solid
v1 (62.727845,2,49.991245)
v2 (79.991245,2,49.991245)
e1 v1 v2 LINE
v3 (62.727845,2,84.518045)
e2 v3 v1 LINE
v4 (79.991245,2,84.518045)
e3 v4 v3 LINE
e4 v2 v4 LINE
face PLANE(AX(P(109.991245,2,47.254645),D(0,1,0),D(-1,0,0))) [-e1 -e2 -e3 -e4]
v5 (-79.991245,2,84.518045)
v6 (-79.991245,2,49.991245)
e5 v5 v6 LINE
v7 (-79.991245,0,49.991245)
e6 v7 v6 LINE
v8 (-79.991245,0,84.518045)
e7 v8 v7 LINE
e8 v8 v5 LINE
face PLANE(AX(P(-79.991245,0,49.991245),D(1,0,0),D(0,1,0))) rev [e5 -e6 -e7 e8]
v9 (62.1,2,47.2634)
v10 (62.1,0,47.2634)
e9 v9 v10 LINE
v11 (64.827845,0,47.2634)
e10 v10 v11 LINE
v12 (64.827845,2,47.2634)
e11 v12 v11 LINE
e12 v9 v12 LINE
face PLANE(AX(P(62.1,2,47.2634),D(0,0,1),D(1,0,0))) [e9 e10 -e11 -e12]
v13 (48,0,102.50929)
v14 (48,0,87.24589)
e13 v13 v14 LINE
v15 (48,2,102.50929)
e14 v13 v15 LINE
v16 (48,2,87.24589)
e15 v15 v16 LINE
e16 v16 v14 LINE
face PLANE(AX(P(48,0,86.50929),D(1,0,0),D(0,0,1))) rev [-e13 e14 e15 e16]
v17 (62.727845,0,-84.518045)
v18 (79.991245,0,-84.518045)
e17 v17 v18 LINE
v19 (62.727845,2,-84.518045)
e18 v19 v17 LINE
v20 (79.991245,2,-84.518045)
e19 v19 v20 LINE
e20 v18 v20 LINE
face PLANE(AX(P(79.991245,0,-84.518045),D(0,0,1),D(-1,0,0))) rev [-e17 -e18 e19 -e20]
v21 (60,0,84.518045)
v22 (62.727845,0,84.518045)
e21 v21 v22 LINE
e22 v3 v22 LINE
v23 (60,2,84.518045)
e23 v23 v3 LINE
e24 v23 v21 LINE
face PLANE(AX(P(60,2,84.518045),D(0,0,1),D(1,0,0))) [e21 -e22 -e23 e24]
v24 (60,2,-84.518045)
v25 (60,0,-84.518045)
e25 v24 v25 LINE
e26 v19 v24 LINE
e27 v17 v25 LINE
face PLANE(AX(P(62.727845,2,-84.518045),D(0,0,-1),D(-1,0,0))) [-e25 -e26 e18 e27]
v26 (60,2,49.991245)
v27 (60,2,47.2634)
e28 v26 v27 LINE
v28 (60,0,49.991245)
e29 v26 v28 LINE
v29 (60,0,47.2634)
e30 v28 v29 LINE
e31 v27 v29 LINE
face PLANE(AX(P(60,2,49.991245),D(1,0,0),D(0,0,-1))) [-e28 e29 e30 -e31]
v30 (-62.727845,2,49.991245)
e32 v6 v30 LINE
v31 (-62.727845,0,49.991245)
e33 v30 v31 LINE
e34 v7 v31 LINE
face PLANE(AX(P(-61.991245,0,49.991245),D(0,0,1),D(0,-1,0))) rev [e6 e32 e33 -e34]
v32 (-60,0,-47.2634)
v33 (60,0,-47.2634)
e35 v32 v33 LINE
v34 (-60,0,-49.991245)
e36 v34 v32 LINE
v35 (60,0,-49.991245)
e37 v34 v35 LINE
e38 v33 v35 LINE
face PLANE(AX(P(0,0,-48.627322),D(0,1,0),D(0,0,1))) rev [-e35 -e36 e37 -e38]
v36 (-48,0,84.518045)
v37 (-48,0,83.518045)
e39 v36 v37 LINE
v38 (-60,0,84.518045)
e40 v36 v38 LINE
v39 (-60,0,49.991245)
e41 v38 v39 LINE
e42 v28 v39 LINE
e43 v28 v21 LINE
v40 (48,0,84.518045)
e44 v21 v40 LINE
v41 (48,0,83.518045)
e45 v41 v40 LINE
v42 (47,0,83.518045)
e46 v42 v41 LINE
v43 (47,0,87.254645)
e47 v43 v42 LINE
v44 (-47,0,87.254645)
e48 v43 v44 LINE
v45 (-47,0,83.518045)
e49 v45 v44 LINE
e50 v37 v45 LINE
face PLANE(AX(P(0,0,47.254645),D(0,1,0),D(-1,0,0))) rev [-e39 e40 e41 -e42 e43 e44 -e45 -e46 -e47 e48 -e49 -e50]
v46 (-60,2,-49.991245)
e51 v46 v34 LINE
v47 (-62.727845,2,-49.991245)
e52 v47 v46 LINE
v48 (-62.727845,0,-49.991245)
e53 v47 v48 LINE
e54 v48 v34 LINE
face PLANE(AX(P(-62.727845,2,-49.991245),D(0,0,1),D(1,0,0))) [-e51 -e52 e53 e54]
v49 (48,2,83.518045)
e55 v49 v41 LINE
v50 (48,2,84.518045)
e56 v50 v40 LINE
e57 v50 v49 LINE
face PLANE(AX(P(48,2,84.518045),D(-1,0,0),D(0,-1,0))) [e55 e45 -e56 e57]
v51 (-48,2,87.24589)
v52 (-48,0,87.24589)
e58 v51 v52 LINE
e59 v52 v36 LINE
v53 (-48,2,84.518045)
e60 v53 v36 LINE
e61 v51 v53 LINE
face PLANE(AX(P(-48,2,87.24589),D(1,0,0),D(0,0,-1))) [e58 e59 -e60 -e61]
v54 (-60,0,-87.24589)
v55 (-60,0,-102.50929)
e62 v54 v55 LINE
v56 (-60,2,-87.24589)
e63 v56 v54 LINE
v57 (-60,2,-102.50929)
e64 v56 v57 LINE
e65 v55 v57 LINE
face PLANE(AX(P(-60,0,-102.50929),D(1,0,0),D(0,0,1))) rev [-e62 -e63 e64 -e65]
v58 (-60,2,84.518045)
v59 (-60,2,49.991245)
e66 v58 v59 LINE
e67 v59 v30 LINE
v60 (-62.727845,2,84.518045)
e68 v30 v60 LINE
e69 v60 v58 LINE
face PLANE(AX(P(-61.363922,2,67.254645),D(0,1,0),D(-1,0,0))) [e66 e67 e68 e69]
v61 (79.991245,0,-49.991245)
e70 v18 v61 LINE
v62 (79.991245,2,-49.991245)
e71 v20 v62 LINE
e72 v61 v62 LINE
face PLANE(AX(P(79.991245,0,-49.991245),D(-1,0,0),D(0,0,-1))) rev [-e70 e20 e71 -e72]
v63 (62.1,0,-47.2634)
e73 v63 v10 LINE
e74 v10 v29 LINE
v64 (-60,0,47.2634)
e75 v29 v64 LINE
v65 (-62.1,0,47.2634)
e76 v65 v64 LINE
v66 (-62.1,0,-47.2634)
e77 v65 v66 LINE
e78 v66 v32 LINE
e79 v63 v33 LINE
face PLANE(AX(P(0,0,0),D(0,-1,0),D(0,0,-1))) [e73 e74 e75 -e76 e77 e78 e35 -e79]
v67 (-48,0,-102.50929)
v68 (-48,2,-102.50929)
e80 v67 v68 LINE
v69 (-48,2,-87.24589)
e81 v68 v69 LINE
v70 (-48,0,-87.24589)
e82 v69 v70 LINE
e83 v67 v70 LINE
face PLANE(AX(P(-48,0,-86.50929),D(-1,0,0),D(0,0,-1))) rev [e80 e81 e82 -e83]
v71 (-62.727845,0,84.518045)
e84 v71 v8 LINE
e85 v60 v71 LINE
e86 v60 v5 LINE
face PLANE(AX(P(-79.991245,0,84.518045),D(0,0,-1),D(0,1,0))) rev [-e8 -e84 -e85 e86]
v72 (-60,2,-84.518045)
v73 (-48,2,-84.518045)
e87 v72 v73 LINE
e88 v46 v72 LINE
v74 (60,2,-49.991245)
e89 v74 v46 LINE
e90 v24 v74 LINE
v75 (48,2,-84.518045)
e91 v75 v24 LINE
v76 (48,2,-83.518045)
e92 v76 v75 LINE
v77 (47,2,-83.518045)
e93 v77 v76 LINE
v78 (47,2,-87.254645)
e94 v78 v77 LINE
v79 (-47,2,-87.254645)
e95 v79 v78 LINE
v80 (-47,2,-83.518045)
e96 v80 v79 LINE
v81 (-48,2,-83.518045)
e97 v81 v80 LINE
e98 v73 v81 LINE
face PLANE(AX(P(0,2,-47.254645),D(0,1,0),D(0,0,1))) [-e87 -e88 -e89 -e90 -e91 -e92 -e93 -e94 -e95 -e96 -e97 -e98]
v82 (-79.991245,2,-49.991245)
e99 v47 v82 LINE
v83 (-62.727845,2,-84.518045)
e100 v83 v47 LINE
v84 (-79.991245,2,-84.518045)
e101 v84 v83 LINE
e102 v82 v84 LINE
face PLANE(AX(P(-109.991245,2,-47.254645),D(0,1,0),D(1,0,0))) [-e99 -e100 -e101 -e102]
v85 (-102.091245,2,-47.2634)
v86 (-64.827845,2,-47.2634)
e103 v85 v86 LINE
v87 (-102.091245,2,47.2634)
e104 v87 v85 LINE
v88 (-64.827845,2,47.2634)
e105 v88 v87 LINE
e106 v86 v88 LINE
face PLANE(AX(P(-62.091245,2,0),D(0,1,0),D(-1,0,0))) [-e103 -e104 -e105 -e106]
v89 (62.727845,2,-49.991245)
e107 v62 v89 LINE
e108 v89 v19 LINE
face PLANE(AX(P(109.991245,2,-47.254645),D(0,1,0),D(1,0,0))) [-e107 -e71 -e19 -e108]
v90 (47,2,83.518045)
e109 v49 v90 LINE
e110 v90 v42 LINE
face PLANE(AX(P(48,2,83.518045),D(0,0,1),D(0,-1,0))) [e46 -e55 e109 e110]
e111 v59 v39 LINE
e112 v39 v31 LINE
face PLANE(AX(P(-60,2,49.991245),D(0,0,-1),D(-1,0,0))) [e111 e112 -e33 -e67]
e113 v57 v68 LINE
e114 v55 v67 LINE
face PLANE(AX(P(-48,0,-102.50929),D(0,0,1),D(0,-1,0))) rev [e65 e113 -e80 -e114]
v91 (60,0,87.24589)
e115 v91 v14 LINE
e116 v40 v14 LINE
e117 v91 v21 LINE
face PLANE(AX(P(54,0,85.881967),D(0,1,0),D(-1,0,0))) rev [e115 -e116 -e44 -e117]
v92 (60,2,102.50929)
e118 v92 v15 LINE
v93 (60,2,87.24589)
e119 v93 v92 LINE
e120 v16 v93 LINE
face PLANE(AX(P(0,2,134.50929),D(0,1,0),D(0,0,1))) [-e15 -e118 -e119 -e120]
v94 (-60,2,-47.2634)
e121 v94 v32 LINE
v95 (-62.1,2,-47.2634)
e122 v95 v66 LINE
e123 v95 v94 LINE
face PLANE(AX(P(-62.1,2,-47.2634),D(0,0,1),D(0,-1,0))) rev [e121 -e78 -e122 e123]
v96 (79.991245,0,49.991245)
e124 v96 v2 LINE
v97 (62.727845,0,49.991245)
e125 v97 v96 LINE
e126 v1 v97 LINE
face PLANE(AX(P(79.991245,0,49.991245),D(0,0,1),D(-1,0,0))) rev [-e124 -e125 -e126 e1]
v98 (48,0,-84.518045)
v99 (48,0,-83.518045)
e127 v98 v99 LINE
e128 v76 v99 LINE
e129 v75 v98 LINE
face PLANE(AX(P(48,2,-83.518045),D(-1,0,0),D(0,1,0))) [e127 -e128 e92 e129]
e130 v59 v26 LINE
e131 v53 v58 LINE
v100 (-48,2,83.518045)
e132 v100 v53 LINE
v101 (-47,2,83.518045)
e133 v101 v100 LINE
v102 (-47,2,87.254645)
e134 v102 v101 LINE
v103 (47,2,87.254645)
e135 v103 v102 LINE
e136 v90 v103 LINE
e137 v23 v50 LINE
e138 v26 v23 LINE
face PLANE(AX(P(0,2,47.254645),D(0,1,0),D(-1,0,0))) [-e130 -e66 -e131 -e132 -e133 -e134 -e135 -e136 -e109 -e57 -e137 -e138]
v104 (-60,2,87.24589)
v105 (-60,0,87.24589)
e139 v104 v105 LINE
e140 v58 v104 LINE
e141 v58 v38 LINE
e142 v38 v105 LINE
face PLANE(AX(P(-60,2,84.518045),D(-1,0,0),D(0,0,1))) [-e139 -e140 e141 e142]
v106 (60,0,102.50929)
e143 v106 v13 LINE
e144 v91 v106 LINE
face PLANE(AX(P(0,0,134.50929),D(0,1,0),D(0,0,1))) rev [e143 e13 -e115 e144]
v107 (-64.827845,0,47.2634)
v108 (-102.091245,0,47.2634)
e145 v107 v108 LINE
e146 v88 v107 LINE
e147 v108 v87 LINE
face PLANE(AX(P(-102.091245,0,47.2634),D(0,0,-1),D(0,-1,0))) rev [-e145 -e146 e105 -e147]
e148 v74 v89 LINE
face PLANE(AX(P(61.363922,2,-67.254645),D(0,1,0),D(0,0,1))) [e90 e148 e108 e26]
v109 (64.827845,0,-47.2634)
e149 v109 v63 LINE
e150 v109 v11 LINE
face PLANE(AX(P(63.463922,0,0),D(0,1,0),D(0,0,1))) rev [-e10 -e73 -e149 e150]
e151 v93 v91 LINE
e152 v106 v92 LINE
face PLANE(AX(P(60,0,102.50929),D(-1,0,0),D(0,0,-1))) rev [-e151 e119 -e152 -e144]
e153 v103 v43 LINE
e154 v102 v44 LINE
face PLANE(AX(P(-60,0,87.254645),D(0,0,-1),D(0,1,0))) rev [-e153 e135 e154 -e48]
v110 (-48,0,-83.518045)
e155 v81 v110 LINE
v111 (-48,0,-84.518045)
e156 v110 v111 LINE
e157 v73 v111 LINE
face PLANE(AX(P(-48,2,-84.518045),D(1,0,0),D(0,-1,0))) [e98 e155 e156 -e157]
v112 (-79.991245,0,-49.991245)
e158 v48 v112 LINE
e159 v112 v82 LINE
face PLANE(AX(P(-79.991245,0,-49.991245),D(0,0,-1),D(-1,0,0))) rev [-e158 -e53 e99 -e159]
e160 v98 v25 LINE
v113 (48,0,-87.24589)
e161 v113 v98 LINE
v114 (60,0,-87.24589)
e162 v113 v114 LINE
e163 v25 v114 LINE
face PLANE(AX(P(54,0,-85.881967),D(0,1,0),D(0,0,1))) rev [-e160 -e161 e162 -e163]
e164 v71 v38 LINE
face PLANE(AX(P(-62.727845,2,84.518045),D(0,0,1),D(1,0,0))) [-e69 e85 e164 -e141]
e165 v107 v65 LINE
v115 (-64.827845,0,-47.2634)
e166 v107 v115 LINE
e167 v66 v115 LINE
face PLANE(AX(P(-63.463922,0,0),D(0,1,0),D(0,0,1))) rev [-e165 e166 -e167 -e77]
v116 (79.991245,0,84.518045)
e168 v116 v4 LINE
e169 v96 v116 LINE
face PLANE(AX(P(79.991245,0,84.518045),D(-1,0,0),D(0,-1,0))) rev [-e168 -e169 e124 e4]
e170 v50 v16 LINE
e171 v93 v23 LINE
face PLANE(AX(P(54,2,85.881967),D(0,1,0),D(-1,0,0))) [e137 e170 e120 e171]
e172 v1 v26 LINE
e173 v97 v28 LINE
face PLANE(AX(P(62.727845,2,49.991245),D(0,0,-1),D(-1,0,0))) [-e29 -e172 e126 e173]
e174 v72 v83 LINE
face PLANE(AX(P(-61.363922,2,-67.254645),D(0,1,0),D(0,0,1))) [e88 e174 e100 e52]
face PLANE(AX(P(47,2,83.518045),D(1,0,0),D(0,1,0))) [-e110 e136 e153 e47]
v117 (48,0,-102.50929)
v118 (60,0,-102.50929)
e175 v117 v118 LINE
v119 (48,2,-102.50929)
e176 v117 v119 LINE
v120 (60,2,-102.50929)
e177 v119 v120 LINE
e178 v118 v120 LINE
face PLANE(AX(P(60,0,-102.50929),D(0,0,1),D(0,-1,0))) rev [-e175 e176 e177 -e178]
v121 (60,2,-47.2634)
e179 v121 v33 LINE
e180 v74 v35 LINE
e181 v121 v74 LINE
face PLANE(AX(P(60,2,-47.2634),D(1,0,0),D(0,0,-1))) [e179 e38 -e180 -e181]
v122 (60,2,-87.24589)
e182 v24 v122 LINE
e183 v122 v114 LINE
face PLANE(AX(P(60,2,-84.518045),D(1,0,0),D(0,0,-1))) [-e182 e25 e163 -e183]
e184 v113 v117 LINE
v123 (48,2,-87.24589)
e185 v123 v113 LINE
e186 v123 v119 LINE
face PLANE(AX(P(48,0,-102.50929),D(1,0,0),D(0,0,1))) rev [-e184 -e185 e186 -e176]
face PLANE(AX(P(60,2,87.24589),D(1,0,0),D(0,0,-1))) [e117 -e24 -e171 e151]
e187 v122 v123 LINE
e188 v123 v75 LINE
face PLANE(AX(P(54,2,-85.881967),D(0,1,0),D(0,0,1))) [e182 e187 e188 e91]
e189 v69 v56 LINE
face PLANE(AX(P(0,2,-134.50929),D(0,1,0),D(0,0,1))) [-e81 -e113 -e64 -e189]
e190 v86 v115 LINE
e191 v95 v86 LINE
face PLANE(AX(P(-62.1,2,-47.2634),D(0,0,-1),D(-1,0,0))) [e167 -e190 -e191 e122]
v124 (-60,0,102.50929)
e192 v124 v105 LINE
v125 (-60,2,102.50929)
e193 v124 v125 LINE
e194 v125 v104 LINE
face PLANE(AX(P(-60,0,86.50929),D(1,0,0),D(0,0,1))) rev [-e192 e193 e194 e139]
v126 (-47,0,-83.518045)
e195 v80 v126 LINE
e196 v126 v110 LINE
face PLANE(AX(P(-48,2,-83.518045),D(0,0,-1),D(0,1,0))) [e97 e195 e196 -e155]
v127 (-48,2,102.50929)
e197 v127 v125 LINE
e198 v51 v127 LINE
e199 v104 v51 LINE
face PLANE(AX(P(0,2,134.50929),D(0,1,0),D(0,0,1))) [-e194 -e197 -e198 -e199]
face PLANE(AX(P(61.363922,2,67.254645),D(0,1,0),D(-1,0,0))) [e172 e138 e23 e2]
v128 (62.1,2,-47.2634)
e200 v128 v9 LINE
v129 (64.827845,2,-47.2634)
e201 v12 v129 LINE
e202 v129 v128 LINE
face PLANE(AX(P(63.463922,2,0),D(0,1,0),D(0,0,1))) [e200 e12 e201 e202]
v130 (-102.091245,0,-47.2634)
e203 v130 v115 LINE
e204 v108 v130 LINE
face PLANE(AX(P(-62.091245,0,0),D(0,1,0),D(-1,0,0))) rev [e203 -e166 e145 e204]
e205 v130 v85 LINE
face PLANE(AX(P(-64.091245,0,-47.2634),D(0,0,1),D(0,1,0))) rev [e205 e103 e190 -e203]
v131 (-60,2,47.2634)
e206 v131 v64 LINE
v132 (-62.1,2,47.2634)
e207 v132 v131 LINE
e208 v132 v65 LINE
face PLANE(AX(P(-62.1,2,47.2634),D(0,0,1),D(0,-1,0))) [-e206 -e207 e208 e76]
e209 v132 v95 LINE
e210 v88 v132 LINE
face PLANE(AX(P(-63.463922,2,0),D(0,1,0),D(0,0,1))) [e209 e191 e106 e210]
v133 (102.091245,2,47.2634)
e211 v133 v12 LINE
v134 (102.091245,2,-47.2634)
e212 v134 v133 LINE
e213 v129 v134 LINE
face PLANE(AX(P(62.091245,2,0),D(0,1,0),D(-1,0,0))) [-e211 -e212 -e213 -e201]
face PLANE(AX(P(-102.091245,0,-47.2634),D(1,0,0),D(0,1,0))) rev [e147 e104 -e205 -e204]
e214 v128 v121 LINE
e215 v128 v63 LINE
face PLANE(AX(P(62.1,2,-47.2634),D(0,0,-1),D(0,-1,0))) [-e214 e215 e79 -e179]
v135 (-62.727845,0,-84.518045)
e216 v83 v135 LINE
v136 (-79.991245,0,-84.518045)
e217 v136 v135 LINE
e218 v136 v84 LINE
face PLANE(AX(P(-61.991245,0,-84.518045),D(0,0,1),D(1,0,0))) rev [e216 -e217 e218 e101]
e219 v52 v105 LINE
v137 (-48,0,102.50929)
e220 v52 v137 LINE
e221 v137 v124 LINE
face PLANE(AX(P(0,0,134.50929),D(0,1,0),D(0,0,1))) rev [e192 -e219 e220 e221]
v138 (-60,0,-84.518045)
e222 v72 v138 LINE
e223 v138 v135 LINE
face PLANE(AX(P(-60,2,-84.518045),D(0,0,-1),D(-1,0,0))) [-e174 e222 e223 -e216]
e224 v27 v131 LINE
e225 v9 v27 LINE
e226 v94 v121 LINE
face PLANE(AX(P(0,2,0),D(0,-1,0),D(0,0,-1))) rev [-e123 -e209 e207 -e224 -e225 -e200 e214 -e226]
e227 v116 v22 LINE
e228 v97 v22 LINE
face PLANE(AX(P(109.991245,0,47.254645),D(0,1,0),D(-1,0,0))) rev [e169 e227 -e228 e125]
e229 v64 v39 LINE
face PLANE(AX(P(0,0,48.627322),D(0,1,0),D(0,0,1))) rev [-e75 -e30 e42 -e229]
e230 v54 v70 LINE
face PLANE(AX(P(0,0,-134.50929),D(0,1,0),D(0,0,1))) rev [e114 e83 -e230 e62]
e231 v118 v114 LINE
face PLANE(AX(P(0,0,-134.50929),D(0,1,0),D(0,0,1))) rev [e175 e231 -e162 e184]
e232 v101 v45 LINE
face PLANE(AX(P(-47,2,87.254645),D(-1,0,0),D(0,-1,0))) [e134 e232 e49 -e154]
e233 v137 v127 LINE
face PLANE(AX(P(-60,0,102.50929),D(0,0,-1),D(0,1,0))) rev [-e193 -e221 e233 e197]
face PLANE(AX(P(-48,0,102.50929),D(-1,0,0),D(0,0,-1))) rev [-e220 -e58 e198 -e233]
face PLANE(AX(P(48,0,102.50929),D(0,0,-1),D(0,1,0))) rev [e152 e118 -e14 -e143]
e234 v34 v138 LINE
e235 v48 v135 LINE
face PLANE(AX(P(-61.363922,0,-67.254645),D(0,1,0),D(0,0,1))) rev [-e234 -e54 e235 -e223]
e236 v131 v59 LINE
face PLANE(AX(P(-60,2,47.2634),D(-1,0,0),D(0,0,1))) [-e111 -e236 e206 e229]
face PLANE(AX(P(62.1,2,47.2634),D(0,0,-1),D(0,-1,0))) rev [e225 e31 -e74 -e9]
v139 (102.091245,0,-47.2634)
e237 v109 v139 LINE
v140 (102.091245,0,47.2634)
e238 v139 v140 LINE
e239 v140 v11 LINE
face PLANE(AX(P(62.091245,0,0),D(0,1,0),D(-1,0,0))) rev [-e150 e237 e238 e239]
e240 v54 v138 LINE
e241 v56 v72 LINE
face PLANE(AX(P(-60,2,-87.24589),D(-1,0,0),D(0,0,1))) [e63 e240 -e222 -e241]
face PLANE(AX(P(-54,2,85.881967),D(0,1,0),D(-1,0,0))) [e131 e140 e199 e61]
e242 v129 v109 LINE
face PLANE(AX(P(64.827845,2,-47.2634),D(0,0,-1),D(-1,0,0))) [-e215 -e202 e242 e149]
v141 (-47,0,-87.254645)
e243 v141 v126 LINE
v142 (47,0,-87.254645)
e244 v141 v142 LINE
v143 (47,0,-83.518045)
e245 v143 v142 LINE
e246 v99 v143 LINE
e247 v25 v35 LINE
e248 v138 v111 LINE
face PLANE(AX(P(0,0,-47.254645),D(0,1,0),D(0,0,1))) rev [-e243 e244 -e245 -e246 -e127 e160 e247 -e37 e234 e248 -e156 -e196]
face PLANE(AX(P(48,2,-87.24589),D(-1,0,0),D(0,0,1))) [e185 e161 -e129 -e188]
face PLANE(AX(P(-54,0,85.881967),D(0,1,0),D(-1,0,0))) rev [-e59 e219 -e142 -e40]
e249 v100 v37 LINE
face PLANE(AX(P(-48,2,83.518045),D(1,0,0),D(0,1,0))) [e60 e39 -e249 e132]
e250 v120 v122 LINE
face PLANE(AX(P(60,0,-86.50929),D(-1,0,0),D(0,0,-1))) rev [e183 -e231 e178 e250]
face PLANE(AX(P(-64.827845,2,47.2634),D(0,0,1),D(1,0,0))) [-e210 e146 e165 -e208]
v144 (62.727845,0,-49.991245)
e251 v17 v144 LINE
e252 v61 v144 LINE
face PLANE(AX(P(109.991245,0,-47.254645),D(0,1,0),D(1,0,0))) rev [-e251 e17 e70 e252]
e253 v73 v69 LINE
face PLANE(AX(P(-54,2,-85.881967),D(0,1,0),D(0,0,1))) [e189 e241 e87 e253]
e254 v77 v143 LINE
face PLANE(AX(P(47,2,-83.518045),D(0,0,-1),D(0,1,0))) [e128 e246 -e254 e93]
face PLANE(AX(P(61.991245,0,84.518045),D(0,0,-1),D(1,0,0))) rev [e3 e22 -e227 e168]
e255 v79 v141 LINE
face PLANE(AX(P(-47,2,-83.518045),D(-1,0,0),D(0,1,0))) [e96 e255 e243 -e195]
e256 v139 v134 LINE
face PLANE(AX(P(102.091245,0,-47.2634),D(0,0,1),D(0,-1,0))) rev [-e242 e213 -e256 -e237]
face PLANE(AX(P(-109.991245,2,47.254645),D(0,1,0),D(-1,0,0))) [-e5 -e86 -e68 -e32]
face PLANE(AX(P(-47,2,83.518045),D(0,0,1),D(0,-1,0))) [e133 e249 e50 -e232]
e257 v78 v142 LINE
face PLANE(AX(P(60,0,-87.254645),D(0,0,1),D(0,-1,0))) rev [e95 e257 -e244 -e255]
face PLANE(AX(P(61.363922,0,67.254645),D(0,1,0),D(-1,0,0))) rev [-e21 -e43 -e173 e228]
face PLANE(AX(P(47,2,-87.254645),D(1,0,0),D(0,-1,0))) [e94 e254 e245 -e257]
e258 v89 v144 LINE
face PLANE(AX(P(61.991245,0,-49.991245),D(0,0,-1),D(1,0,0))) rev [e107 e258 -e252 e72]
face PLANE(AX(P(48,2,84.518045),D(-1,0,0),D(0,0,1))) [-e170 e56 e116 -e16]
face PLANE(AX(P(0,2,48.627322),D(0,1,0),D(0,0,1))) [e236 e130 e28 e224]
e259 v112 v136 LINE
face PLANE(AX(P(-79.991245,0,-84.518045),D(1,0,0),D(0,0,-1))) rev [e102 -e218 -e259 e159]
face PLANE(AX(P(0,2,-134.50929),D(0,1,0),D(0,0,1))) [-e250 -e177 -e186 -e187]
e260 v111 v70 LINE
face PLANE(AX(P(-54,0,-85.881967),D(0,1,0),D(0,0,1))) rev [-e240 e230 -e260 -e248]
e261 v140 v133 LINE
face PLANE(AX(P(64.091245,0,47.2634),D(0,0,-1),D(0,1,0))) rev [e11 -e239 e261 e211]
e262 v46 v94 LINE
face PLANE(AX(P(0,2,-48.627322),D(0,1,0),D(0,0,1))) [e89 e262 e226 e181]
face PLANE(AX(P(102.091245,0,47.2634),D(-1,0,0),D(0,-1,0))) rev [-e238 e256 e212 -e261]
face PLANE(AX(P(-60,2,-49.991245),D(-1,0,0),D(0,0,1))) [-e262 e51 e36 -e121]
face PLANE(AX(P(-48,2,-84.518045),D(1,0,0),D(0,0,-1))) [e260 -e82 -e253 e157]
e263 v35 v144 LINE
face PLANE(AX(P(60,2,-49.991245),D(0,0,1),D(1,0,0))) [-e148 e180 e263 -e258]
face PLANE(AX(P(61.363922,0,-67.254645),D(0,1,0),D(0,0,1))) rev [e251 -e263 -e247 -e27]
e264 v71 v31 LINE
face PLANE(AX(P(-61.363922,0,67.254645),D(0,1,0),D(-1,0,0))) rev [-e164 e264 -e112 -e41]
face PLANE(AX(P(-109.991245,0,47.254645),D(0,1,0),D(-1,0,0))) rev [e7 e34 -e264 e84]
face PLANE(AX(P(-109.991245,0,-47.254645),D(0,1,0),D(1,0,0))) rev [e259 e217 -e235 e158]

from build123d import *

# Parameters (mm, degrees)
SKETCH1_W                      = 120
SKETCH1_H                      = 100
BASE_FLANGE1_DEPTH             = 2
EDGE_FLANGE1_STRIP_W           = 9.4732
EDGE_FLANGE1_STRIP_H           = 2
EDGE_FLANGE1_STRIP_CUT_DEPTH   = 120
EDGE_FLANGE1_STRIP_2_W         = 9.4732
EDGE_FLANGE1_STRIP_2_H         = 2
EDGE_FLANGE1_STRIP_CUT_2_DEPTH = 120
EDGE_FLANGE1_DEPTH             = 120
EDGE_FLANGE1_BEND_DEPTH        = 120
EDGE_FLANGE2_DEPTH             = 94.5268
EDGE_FLANGE2_BEND_DEPTH        = 94.5268
EDGE_FLANGE5_STRIP_W           = 9.4732
EDGE_FLANGE5_STRIP_H           = 2
EDGE_FLANGE5_STRIP_CUT_DEPTH   = 12
EDGE_FLANGE5_RELIEF_W          = 10.4732
EDGE_FLANGE5_RELIEF_H          = 1
EDGE_FLANGE5_RELIEF_CUT_DEPTH  = 2
EDGE_FLANGE5_DEPTH             = 12
EDGE_FLANGE6_STRIP_W           = 9.4732
EDGE_FLANGE6_STRIP_H           = 2
EDGE_FLANGE6_STRIP_CUT_DEPTH   = 12
EDGE_FLANGE6_RELIEF_W          = 10.4732
EDGE_FLANGE6_RELIEF_H          = 1
EDGE_FLANGE6_RELIEF_CUT_DEPTH  = 2
EDGE_FLANGE6_DEPTH             = 12
EDGE_FLANGE7_STRIP_W           = 9.4732
EDGE_FLANGE7_STRIP_H           = 2
EDGE_FLANGE7_STRIP_CUT_DEPTH   = 12
EDGE_FLANGE7_RELIEF_W          = 10.4732
EDGE_FLANGE7_RELIEF_H          = 1
EDGE_FLANGE7_RELIEF_CUT_DEPTH  = 2
EDGE_FLANGE7_DEPTH             = 12
EDGE_FLANGE8_STRIP_W           = 9.4732
EDGE_FLANGE8_STRIP_H           = 2
EDGE_FLANGE8_STRIP_CUT_DEPTH   = 12
EDGE_FLANGE8_RELIEF_W          = 10.4732
EDGE_FLANGE8_RELIEF_H          = 1
EDGE_FLANGE8_RELIEF_CUT_DEPTH  = 2
EDGE_FLANGE8_DEPTH             = 12
EDGE_FLANGE9_DEPTH             = 34.5268
EDGE_FLANGE9_BEND_DEPTH        = 34.5268
EDGE_FLANGE9_BEND_2_DEPTH      = 34.5268
EDGE_FLANGE9_BEND_3_DEPTH      = 34.5268
UNFOLD1_START                  = 2
UNFOLD1_DEPTH                  = 38
UNFOLD1_2_DEPTH                = 2


# Read off the part's stored shape, not the designer's step: Unfold1
# Sheet-metal steps are written as plain solids
with BuildPart() as part:
    # Sketch1 → Base-Flange1 (new body)
    with BuildSketch(Plane(origin=(0, 0, 0), x_dir=(1, 0, 0), z_dir=(0, 1, 0))):
        Rectangle(SKETCH1_W, SKETCH1_H)
    extrude(amount=BASE_FLANGE1_DEPTH)

    # Edge-Flange1 strip (across the edge) → Edge-Flange1 strip cut (cut)
    with BuildSketch(Plane(origin=(60, 2, -50), x_dir=(0, 0, 1), z_dir=(-1, 0, 0))):
        with Locations((-2, -1)):
            Rectangle(EDGE_FLANGE1_STRIP_W, EDGE_FLANGE1_STRIP_H)
    extrude(amount=EDGE_FLANGE1_STRIP_CUT_DEPTH, mode=Mode.SUBTRACT)

    # Edge-Flange1 strip 2 (across the edge) → Edge-Flange1 strip cut 2 (cut)
    with BuildSketch(Plane(origin=(-60, 2, 50), x_dir=(0, 0, -1), z_dir=(1, 0, 0))):
        with Locations((-2, -1)):
            Rectangle(EDGE_FLANGE1_STRIP_2_W, EDGE_FLANGE1_STRIP_2_H)
    extrude(amount=EDGE_FLANGE1_STRIP_CUT_2_DEPTH, mode=Mode.SUBTRACT)

    # Edge-Flange1 section (across the edge) → Edge-Flange1 (add)
    with BuildSketch(Plane(origin=(60, 2, -50), x_dir=(0, 0, 1), z_dir=(-1, 0, 0))):
        with BuildLine():
            Line((0, 0.7366), (0, 38))
            Line((0, 38), (2, 38))
            Line((2, 38), (2, 0.7366))
            ThreePointArc((2, 0.7366), (2.215745145, 0.215745145), (2.7366, 0))
            Line((2.7366, 0), (2.7366, -2))
            ThreePointArc((2.7366, -2), (0.801531583, -1.198468417), (0, 0.7366))
        make_face()
    extrude(amount=EDGE_FLANGE1_DEPTH)

    # Edge-Flange1 section 2 (across the edge) → Edge-Flange1 bend (add)
    with BuildSketch(Plane(origin=(-60, 2, 50), x_dir=(0, 0, -1), z_dir=(1, 0, 0))):
        with BuildLine():
            Line((0, 0.7366), (0, 38))
            Line((0, 38), (2, 38))
            Line((2, 38), (2, 0.7366))
            ThreePointArc((2, 0.7366), (2.215745145, 0.215745145), (2.7366, 0))
            Line((2.7366, 0), (2.7366, -2))
            ThreePointArc((2.7366, -2), (0.801531583, -1.198468417), (0, 0.7366))
        make_face()
    extrude(amount=EDGE_FLANGE1_BEND_DEPTH)

    # Edge-Flange2 section (across the edge) → Edge-Flange2 (add)
    with BuildSketch(Plane(origin=(-62.8366, 2, -47.2634), x_dir=(1, 0, 0), z_dir=(0, 0, 1))):
        with BuildLine():
            Line((-2, 0.7366), (-2, 38))
            Line((-2, 38), (0, 38))
            Line((0, 38), (0, 0.7366))
            ThreePointArc((0, 0.7366), (0.215745145, 0.215745145), (0.7366, 0))
            Line((0.7366, 0), (2.8366, 0))
            Line((2.8366, 0), (2.8366, -2))
            Line((2.8366, -2), (0.7366, -2))
            ThreePointArc((0.7366, -2), (-1.198468417, -1.198468417), (-2, 0.7366))
        make_face()
    extrude(amount=EDGE_FLANGE2_DEPTH)

    # Edge-Flange2 section 2 (across the edge) → Edge-Flange2 bend (add)
    with BuildSketch(Plane(origin=(62.8366, 2, 47.2634), x_dir=(-1, 0, 0), z_dir=(0, 0, -1))):
        with BuildLine():
            Line((-2, 0.7366), (-2, 38))
            Line((-2, 38), (0, 38))
            Line((0, 38), (0, 0.7366))
            ThreePointArc((0, 0.7366), (0.215745145, 0.215745145), (0.7366, 0))
            Line((0.7366, 0), (2.8366, 0))
            Line((2.8366, 0), (2.8366, -2))
            Line((2.8366, -2), (0.7366, -2))
            ThreePointArc((0.7366, -2), (-1.198468417, -1.198468417), (-2, 0.7366))
        make_face()
    extrude(amount=EDGE_FLANGE2_BEND_DEPTH)

    # Edge-Flange5 strip (across the edge) → Edge-Flange5 strip cut (cut)
    with BuildSketch(Plane(origin=(48, 40, 48), x_dir=(0, -1, 0), z_dir=(1, 0, 0))):
        with Locations((-2, -1)):
            Rectangle(EDGE_FLANGE5_STRIP_W, EDGE_FLANGE5_STRIP_H)
    extrude(amount=EDGE_FLANGE5_STRIP_CUT_DEPTH, mode=Mode.SUBTRACT)

    # Edge-Flange5 relief (on the sheet) → Edge-Flange5 relief cut (cut)
    with BuildSketch(Plane(origin=(48, 37.2634, 48), x_dir=(0, -1, 0), z_dir=(0, 0, -1))):
        with Locations((-4.2366, 0.5)):
            Rectangle(EDGE_FLANGE5_RELIEF_W, EDGE_FLANGE5_RELIEF_H)
    extrude(amount=-EDGE_FLANGE5_RELIEF_CUT_DEPTH, mode=Mode.SUBTRACT)

    # Edge-Flange5 section (across the edge) → Edge-Flange5 (add)
    with BuildSketch(Plane(origin=(48, 40, 48), x_dir=(0, -1, 0), z_dir=(1, 0, 0))):
        with BuildLine():
            Line((0, 0.7366), (0, 16))
            Line((0, 16), (2, 16))
            Line((2, 16), (2, 0.7366))
            ThreePointArc((2, 0.7366), (2.215745145, 0.215745145), (2.7366, 0))
            Line((2.7366, 0), (2.7366, -2))
            ThreePointArc((2.7366, -2), (0.801531583, -1.198468417), (0, 0.7366))
        make_face()
    extrude(amount=EDGE_FLANGE5_DEPTH)

    # Edge-Flange6 strip (across the edge) → Edge-Flange6 strip cut (cut)
    with BuildSketch(Plane(origin=(-60, 40, 48), x_dir=(0, -1, 0), z_dir=(1, 0, 0))):
        with Locations((-2, -1)):
            Rectangle(EDGE_FLANGE6_STRIP_W, EDGE_FLANGE6_STRIP_H)
    extrude(amount=EDGE_FLANGE6_STRIP_CUT_DEPTH, mode=Mode.SUBTRACT)

    # Edge-Flange6 relief (on the sheet) → Edge-Flange6 relief cut (cut)
    with BuildSketch(Plane(origin=(-60, 37.2634, 48), x_dir=(0, -1, 0), z_dir=(0, 0, -1))):
        with Locations((-4.2366, -12.5)):
            Rectangle(EDGE_FLANGE6_RELIEF_W, EDGE_FLANGE6_RELIEF_H)
    extrude(amount=-EDGE_FLANGE6_RELIEF_CUT_DEPTH, mode=Mode.SUBTRACT)

    # Edge-Flange6 section (across the edge) → Edge-Flange6 (add)
    with BuildSketch(Plane(origin=(-60, 40, 48), x_dir=(0, -1, 0), z_dir=(1, 0, 0))):
        with BuildLine():
            Line((0, 0.7366), (0, 16))
            Line((0, 16), (2, 16))
            Line((2, 16), (2, 0.7366))
            ThreePointArc((2, 0.7366), (2.215745145, 0.215745145), (2.7366, 0))
            Line((2.7366, 0), (2.7366, -2))
            ThreePointArc((2.7366, -2), (0.801531583, -1.198468417), (0, 0.7366))
        make_face()
    extrude(amount=EDGE_FLANGE6_DEPTH)

    # Edge-Flange7 strip (across the edge) → Edge-Flange7 strip cut (cut)
    with BuildSketch(Plane(origin=(-48, 40, -48), x_dir=(0, -1, 0), z_dir=(-1, 0, 0))):
        with Locations((-2, -1)):
            Rectangle(EDGE_FLANGE7_STRIP_W, EDGE_FLANGE7_STRIP_H)
    extrude(amount=EDGE_FLANGE7_STRIP_CUT_DEPTH, mode=Mode.SUBTRACT)

    # Edge-Flange7 relief (on the sheet) → Edge-Flange7 relief cut (cut)
    with BuildSketch(Plane(origin=(-48, 37.2634, -48), x_dir=(0, -1, 0), z_dir=(0, 0, 1))):
        with Locations((-4.2366, 0.5)):
            Rectangle(EDGE_FLANGE7_RELIEF_W, EDGE_FLANGE7_RELIEF_H)
    extrude(amount=-EDGE_FLANGE7_RELIEF_CUT_DEPTH, mode=Mode.SUBTRACT)

    # Edge-Flange7 section (across the edge) → Edge-Flange7 (add)
    with BuildSketch(Plane(origin=(-48, 40, -48), x_dir=(0, -1, 0), z_dir=(-1, 0, 0))):
        with BuildLine():
            Line((0, 0.7366), (0, 16))
            Line((0, 16), (2, 16))
            Line((2, 16), (2, 0.7366))
            ThreePointArc((2, 0.7366), (2.215745145, 0.215745145), (2.7366, 0))
            Line((2.7366, 0), (2.7366, -2))
            ThreePointArc((2.7366, -2), (0.801531583, -1.198468417), (0, 0.7366))
        make_face()
    extrude(amount=EDGE_FLANGE7_DEPTH)

    # Edge-Flange8 strip (across the edge) → Edge-Flange8 strip cut (cut)
    with BuildSketch(Plane(origin=(60, 40, -48), x_dir=(0, -1, 0), z_dir=(-1, 0, 0))):
        with Locations((-2, -1)):
            Rectangle(EDGE_FLANGE8_STRIP_W, EDGE_FLANGE8_STRIP_H)
    extrude(amount=EDGE_FLANGE8_STRIP_CUT_DEPTH, mode=Mode.SUBTRACT)

    # Edge-Flange8 relief (on the sheet) → Edge-Flange8 relief cut (cut)
    with BuildSketch(Plane(origin=(60, 37.2634, -48), x_dir=(0, -1, 0), z_dir=(0, 0, 1))):
        with Locations((-4.2366, -12.5)):
            Rectangle(EDGE_FLANGE8_RELIEF_W, EDGE_FLANGE8_RELIEF_H)
    extrude(amount=-EDGE_FLANGE8_RELIEF_CUT_DEPTH, mode=Mode.SUBTRACT)

    # Edge-Flange8 section (across the edge) → Edge-Flange8 (add)
    with BuildSketch(Plane(origin=(60, 40, -48), x_dir=(0, -1, 0), z_dir=(-1, 0, 0))):
        with BuildLine():
            Line((0, 0.7366), (0, 16))
            Line((0, 16), (2, 16))
            Line((2, 16), (2, 0.7366))
            ThreePointArc((2, 0.7366), (2.215745145, 0.215745145), (2.7366, 0))
            Line((2.7366, 0), (2.7366, -2))
            ThreePointArc((2.7366, -2), (0.801531583, -1.198468417), (0, 0.7366))
        make_face()
    extrude(amount=EDGE_FLANGE8_DEPTH)

    # Edge-Flange9 section (across the edge) → Edge-Flange9 (add)
    with BuildSketch(Plane(origin=(60.7366, 37.2634, 48), x_dir=(-1, 0, 0), z_dir=(0, -1, 0))):
        with BuildLine():
            Line((-2, 0.7366), (-2, 18))
            Line((-2, 18), (0, 18))
            Line((0, 18), (0, 0.7366))
            ThreePointArc((0, 0.7366), (0.215745145, 0.215745145), (0.7366, 0))
            Line((0.7366, 0), (0.7366, -2))
            ThreePointArc((0.7366, -2), (-1.198468417, -1.198468417), (-2, 0.7366))
        make_face()
    extrude(amount=EDGE_FLANGE9_DEPTH)

    # Edge-Flange9 section 2 (across the edge) → Edge-Flange9 bend (add)
    with BuildSketch(Plane(origin=(60.7366, 2.7366, -48), x_dir=(-1, 0, 0), z_dir=(0, 1, 0))):
        with BuildLine():
            Line((-2, 0.7366), (-2, 18))
            Line((-2, 18), (0, 18))
            Line((0, 18), (0, 0.7366))
            ThreePointArc((0, 0.7366), (0.215745145, 0.215745145), (0.7366, 0))
            Line((0.7366, 0), (0.7366, -2))
            ThreePointArc((0.7366, -2), (-1.198468417, -1.198468417), (-2, 0.7366))
        make_face()
    extrude(amount=EDGE_FLANGE9_BEND_DEPTH)

    # Edge-Flange9 section 3 (across the edge) → Edge-Flange9 bend 2 (add)
    with BuildSketch(Plane(origin=(-60.7366, 37.2634, -48), x_dir=(1, 0, 0), z_dir=(0, -1, 0))):
        with BuildLine():
            Line((-2, 0.7366), (-2, 18))
            Line((-2, 18), (0, 18))
            Line((0, 18), (0, 0.7366))
            ThreePointArc((0, 0.7366), (0.215745145, 0.215745145), (0.7366, 0))
            Line((0.7366, 0), (0.7366, -2))
            ThreePointArc((0.7366, -2), (-1.198468417, -1.198468417), (-2, 0.7366))
        make_face()
    extrude(amount=EDGE_FLANGE9_BEND_2_DEPTH)

    # Edge-Flange9 section 4 (across the edge) → Edge-Flange9 bend 3 (add)
    with BuildSketch(Plane(origin=(-60.7366, 2.7366, 48), x_dir=(1, 0, 0), z_dir=(0, 1, 0))):
        with BuildLine():
            Line((-2, 0.7366), (-2, 18))
            Line((-2, 18), (0, 18))
            Line((0, 18), (0, 0.7366))
            ThreePointArc((0, 0.7366), (0.215745145, 0.215745145), (0.7366, 0))
            Line((0.7366, 0), (0.7366, -2))
            ThreePointArc((0.7366, -2), (-1.198468417, -1.198468417), (-2, 0.7366))
        make_face()
    extrude(amount=EDGE_FLANGE9_BEND_3_DEPTH)

    # Unfold1 outline → Unfold1 (cut)
    with BuildSketch(Plane(origin=(0, 0, 0), x_dir=(1, 0, 0), z_dir=(0, 1, 0)).offset(UNFOLD1_START)):
        with BuildLine():
            Line((62.7366, -47.2634), (64.8366, -47.2634))
            Line((64.8366, -47.2634), (64.8366, 47.2634))
            Line((64.8366, 47.2634), (62.7366, 47.2634))
            ThreePointArc((62.7366, 47.2634), (61.935068417, 49.198468417), (60, 50))
            Line((60, 50), (-60, 50))
            ThreePointArc((-60, 50), (-61.935068417, 49.198468417), (-62.7366, 47.2634))
            Line((-62.7366, 47.2634), (-64.8366, 47.2634))
            Line((-64.8366, 47.2634), (-64.8366, -47.2634))
            Line((-64.8366, -47.2634), (-62.7366, -47.2634))
            ThreePointArc((-62.7366, -47.2634), (-61.935068417, -49.198468417), (-60, -50))
            Line((-60, -50), (60, -50))
            ThreePointArc((60, -50), (61.935068417, -49.198468417), (62.7366, -47.2634))
        make_face()
        with BuildLine():
            ThreePointArc((60.7366, -47.2634), (60.520854855, -47.784254855), (60, -48))
            Line((60, -48), (60, -47.2634))
            Line((60, -47.2634), (60.7366, -47.2634))
        make_face(mode=Mode.SUBTRACT)
        with BuildLine():
            Line((-60.7366, -47.2634), (-60, -47.2634))
            Line((-60, -47.2634), (-60, -48))
            ThreePointArc((-60, -48), (-60.520854855, -47.784254855), (-60.7366, -47.2634))
        make_face(mode=Mode.SUBTRACT)
        with BuildLine():
            Line((-60, 47.2634), (-60.7366, 47.2634))
            ThreePointArc((-60.7366, 47.2634), (-60.520854855, 47.784254855), (-60, 48))
            Line((-60, 48), (-60, 47.2634))
        make_face(mode=Mode.SUBTRACT)
        with BuildLine():
            Line((60.7366, 47.2634), (60, 47.2634))
            Line((60, 47.2634), (60, 48))
            ThreePointArc((60, 48), (60.520854855, 47.784254855), (60.7366, 47.2634))
        make_face(mode=Mode.SUBTRACT)
    extrude(amount=UNFOLD1_DEPTH, mode=Mode.SUBTRACT)

    # Unfold1 2 outline → Unfold1 2 (add)
    with BuildSketch(Plane(origin=(0, 0, 0), x_dir=(1, 0, 0), z_dir=(0, 1, 0))):
        Polygon((102.091244901, -47.2634), (102.091244901, 47.2634), (60, 47.2634), (60, 49.991244901), (79.991244901, 49.991244901), (79.991244901, 84.518044901), (60, 84.518044901), (60, 102.509289802), (48, 102.509289802), (48, 83.518044901), (47, 83.518044901), (47, 87.254644901), (-47, 87.254644901), (-47, 83.518044901), (-48, 83.518044901), (-48, 102.509289802), (-60, 102.509289802), (-60, 84.518044901), (-79.991244901, 84.518044901), (-79.991244901, 49.991244901), (-60, 49.991244901), (-60, 47.2634), (-102.091244901, 47.2634), (-102.091244901, -47.2634), (-60, -47.2634), (-60, -49.991244901), (-79.991244901, -49.991244901), (-79.991244901, -84.518044901), (-60, -84.518044901), (-60, -102.509289802), (-48, -102.509289802), (-48, -83.518044901), (-47, -83.518044901), (-47, -87.254644901), (47, -87.254644901), (47, -83.518044901), (48, -83.518044901), (48, -102.509289802), (60, -102.509289802), (60, -84.518044901), (79.991244901, -84.518044901), (79.991244901, -49.991244901), (60, -49.991244901), (60, -47.2634), align=None)
    extrude(amount=UNFOLD1_2_DEPTH)


solid = part.part
